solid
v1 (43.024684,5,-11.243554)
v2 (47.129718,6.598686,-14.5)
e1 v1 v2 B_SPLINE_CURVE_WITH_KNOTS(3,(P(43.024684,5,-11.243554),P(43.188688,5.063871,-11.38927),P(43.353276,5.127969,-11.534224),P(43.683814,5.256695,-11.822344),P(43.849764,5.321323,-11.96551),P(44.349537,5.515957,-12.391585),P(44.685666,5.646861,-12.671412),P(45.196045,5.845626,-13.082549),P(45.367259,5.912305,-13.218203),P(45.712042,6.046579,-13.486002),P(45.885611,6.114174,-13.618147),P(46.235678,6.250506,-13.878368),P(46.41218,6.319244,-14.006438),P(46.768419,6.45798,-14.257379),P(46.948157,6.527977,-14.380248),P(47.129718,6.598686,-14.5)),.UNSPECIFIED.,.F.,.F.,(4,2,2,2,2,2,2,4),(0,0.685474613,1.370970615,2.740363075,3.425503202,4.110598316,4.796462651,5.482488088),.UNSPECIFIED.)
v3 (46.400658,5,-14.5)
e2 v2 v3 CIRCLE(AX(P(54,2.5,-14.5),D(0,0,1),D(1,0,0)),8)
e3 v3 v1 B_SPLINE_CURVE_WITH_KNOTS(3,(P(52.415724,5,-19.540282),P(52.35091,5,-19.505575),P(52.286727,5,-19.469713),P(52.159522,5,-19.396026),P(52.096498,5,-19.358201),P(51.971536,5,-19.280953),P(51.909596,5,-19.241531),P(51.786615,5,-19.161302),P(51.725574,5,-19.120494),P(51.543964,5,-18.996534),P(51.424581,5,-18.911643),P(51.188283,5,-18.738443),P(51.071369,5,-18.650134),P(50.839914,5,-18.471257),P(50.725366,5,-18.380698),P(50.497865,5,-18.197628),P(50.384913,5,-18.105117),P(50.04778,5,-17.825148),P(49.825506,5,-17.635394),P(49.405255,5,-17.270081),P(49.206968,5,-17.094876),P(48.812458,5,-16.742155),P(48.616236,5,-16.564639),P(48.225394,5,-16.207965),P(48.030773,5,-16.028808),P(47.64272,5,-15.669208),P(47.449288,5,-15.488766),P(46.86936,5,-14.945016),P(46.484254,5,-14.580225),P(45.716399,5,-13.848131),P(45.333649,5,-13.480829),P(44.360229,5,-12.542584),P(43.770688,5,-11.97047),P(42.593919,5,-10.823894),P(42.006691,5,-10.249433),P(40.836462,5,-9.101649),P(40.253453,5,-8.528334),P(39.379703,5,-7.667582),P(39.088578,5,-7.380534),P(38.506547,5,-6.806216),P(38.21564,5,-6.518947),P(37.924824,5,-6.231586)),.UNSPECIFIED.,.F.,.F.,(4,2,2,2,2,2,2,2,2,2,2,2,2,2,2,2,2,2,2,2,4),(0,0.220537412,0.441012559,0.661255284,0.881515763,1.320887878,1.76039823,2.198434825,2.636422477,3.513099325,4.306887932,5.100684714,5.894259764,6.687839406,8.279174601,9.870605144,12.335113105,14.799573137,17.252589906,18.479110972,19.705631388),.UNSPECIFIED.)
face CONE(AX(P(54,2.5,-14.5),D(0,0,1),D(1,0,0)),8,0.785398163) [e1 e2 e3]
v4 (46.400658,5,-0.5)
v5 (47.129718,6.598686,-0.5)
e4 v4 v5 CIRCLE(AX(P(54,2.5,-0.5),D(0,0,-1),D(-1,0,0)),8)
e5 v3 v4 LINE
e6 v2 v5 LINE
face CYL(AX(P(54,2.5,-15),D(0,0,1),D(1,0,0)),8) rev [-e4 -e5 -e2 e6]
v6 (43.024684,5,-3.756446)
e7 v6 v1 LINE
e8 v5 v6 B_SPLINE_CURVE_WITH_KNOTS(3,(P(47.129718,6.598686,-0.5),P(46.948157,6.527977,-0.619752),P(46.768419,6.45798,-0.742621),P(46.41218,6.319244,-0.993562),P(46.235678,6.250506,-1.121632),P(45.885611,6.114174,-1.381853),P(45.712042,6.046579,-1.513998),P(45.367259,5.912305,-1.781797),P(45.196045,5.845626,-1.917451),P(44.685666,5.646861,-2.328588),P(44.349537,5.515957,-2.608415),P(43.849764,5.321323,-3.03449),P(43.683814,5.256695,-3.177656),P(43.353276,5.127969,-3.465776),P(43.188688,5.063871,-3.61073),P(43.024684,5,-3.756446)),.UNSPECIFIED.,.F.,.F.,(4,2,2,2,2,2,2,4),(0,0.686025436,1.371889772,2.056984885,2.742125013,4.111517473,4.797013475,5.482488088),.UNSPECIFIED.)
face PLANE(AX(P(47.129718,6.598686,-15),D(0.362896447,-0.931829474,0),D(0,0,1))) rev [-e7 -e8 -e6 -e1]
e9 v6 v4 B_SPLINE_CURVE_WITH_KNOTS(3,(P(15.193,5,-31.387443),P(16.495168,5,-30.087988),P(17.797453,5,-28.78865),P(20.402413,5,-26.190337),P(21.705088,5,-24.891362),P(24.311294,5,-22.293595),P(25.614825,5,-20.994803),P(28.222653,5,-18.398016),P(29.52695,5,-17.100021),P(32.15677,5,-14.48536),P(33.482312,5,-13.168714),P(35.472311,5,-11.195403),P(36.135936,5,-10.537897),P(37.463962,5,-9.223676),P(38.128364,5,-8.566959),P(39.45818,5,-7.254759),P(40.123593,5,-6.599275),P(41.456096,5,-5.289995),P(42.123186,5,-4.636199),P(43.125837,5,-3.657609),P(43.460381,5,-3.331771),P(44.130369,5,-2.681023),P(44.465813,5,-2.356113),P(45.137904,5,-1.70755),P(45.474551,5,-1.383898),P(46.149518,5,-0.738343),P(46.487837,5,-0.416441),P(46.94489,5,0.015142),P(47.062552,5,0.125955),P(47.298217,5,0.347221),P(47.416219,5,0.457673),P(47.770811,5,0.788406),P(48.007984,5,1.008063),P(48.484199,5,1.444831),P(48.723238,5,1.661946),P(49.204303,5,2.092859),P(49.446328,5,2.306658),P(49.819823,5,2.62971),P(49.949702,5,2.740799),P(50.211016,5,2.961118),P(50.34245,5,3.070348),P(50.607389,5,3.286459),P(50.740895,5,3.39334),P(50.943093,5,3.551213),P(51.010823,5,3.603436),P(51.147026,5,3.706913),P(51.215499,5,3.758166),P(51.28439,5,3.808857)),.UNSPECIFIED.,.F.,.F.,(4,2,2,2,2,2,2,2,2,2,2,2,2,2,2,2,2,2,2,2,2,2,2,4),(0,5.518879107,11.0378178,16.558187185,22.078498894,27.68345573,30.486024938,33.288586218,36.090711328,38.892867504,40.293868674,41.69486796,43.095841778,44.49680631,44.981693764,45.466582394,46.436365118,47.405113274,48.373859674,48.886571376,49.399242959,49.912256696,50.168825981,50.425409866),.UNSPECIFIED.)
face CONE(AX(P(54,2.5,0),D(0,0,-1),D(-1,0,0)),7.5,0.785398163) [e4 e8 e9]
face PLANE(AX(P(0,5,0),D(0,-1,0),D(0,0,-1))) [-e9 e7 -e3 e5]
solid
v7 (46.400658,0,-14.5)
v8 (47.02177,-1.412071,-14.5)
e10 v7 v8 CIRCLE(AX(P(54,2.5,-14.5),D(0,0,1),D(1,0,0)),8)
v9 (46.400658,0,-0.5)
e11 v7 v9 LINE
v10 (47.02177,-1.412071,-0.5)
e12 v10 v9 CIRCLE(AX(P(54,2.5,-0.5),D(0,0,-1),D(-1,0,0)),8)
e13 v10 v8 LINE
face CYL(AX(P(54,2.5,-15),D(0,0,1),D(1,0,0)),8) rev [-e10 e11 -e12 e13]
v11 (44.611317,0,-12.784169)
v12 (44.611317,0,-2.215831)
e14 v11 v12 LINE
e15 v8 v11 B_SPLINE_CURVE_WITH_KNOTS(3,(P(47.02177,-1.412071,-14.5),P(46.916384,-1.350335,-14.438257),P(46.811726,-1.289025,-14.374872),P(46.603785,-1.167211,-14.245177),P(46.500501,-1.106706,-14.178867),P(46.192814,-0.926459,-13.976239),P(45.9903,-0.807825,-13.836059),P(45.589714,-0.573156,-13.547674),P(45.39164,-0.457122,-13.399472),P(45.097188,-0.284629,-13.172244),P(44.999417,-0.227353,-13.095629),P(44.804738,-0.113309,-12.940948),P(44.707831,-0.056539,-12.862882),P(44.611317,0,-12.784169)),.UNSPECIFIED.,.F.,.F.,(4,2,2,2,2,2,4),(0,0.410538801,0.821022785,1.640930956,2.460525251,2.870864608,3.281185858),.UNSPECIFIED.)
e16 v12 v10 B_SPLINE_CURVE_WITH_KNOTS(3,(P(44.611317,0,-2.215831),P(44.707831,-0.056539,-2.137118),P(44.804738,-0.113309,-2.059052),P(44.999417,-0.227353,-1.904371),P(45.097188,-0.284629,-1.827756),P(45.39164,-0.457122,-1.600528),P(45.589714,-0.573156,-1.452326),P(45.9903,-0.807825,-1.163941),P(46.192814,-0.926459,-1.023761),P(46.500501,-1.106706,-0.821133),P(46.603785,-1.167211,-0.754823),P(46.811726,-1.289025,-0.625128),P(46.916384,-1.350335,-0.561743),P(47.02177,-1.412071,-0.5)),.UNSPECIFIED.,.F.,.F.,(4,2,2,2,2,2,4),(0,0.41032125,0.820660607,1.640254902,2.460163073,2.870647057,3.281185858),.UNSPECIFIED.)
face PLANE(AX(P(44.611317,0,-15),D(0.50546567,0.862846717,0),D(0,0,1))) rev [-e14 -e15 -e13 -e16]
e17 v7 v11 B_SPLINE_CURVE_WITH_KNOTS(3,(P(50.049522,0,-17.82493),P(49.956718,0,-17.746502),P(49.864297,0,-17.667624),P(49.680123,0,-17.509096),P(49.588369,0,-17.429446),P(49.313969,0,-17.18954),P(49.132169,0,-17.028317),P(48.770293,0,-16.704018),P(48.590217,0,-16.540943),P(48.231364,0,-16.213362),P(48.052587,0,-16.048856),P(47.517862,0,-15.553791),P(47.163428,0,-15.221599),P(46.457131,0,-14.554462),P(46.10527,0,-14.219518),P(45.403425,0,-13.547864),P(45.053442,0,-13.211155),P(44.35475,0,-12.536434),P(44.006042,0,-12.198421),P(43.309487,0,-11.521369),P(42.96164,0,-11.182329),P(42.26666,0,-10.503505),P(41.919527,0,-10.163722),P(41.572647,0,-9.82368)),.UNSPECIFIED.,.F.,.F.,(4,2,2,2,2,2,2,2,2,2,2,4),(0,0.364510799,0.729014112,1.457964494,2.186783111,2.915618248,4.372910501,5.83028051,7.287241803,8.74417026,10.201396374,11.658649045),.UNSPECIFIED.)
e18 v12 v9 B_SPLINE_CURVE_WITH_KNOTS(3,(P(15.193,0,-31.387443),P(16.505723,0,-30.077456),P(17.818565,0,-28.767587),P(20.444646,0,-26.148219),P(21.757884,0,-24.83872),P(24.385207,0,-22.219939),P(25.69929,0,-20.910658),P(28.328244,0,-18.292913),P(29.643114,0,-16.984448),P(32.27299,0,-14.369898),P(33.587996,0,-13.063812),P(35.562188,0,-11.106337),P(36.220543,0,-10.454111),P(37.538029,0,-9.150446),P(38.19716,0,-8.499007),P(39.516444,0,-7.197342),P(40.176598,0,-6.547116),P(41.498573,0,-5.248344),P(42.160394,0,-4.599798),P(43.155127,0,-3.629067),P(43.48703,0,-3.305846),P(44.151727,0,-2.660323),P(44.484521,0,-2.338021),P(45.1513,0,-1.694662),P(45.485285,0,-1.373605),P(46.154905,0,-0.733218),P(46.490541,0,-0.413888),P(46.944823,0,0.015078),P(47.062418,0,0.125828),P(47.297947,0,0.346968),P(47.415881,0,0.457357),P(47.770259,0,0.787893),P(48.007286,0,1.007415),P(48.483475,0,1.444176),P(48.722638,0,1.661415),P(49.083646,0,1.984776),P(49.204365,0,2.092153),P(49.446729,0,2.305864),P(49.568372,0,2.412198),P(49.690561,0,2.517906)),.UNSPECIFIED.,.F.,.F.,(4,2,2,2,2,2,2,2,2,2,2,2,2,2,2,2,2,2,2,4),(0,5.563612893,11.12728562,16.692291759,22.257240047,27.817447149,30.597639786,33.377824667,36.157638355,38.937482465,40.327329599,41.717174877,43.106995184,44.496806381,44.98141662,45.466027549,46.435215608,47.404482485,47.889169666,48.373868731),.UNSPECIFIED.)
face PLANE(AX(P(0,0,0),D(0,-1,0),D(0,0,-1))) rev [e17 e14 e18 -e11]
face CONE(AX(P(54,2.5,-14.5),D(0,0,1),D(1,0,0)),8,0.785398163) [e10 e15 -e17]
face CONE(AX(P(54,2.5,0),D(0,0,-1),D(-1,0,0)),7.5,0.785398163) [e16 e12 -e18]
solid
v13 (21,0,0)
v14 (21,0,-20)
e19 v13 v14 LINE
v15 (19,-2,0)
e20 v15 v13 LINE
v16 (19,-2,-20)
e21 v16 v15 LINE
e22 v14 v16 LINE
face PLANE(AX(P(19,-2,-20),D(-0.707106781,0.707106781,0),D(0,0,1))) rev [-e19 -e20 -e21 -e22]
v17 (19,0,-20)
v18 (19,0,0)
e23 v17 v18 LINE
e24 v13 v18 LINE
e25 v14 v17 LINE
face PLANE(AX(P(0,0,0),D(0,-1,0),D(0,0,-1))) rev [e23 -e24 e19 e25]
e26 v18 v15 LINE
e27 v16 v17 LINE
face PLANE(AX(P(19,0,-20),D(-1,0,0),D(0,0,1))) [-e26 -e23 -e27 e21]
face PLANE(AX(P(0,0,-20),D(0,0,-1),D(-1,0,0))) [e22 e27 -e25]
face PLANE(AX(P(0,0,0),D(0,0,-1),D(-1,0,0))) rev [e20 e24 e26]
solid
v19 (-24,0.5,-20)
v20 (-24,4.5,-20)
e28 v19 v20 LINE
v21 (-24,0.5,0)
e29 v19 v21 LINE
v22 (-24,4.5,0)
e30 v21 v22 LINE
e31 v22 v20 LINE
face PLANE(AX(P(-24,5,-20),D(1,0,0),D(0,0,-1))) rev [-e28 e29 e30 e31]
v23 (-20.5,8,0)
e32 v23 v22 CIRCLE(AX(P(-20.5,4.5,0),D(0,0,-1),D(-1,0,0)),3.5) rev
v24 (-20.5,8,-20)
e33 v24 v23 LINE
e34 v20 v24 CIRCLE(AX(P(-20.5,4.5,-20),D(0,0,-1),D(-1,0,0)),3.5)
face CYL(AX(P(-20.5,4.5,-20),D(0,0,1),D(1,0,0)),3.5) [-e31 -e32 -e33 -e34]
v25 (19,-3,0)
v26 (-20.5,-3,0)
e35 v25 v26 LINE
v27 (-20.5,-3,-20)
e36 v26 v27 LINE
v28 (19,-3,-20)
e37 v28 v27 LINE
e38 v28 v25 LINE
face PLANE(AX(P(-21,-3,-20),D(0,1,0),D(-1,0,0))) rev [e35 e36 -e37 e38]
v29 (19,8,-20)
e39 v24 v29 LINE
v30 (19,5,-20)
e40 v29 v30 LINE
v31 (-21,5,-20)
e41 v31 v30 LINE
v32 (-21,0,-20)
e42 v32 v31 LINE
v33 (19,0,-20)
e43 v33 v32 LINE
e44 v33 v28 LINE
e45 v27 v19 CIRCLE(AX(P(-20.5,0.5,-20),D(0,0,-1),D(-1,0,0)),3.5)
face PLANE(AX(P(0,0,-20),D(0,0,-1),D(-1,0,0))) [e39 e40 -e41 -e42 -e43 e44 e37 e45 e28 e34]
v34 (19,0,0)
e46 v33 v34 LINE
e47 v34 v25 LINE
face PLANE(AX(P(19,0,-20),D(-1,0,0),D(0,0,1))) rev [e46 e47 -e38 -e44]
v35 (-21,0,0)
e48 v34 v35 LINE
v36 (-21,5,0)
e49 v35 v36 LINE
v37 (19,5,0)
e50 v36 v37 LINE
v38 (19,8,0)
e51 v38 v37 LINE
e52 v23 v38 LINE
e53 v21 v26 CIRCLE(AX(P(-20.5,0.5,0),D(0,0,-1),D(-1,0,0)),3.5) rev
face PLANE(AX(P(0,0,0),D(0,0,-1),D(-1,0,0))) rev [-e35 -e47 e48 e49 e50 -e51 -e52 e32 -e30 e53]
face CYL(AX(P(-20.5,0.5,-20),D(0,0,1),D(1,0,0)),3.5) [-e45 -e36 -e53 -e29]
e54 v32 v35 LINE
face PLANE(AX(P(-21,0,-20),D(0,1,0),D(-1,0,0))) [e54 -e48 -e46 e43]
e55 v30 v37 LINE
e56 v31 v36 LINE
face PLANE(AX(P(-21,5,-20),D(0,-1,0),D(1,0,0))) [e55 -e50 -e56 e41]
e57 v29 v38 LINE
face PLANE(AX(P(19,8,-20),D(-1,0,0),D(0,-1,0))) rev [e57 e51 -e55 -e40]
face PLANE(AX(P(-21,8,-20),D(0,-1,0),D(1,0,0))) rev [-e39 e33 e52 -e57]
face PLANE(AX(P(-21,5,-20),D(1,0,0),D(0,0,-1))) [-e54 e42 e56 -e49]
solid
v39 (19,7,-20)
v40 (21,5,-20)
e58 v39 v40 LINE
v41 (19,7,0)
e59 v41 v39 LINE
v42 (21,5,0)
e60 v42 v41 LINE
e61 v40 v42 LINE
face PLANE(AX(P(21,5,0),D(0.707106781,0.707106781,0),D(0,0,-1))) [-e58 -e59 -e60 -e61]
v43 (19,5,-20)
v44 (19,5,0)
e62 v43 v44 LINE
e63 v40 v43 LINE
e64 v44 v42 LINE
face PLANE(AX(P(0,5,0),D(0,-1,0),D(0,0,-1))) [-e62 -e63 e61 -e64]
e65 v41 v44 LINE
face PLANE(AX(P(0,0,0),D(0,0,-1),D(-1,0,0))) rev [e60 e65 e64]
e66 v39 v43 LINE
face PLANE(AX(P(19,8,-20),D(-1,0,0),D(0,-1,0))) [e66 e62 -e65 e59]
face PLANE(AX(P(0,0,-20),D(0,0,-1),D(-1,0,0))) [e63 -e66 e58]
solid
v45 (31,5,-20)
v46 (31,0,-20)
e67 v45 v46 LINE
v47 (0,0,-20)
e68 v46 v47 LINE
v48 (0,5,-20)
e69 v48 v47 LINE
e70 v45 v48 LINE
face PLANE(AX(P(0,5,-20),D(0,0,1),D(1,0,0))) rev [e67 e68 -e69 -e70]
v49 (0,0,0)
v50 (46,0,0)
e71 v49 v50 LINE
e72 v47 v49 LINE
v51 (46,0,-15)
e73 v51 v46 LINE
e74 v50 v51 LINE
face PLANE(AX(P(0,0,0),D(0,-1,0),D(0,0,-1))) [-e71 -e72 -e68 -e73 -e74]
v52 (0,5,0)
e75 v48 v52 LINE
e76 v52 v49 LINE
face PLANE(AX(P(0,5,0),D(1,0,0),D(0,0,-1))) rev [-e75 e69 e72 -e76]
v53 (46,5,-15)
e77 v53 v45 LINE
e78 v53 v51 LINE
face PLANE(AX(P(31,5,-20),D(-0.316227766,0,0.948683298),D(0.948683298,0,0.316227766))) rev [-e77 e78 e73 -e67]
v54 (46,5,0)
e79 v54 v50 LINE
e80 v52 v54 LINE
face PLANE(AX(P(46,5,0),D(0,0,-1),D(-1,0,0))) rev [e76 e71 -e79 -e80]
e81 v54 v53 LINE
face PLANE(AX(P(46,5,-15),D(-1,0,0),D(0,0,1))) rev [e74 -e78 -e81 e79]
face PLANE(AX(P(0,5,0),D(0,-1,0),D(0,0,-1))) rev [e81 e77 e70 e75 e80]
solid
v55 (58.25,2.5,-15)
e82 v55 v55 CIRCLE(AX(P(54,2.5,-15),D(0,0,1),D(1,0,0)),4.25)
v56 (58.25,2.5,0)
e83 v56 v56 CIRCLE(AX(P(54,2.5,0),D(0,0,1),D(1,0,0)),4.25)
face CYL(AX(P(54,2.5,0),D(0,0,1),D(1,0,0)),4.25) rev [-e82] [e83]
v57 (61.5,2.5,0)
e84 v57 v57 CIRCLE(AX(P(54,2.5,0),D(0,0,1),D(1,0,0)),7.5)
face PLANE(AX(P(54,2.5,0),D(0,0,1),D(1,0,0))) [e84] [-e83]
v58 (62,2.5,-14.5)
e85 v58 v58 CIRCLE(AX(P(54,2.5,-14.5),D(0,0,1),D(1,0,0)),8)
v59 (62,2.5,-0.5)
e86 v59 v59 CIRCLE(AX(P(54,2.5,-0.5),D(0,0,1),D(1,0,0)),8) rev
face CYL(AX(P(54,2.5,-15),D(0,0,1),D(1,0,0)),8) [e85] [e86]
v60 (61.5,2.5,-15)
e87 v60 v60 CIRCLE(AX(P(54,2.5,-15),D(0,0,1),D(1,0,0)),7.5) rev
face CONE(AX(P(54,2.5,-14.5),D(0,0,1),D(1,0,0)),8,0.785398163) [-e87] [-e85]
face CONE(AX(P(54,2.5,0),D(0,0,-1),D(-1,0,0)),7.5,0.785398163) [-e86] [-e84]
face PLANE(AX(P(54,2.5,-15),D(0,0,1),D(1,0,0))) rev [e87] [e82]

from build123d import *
from OCP.BRepAlgoAPI import BRepAlgoAPI_Cut
from OCP.TopTools import TopTools_ListOfShape

# Parameters (mm, degrees)
P_IDAT_VYSUNUT_M1_DEPTH     = 5
VYSUNOUT_TENKOST_NN_1_DEPTH = 20
ZAOBLIT1_R                  = 3.5
SKICA3_R                    = 8
P_IDAT_VYSUNUT_M2_DEPTH     = 15
SKICA7_W                    = 4.25
SKICA7_H                    = 15.001
ZKOSEN_1_SIZE               = 0.5
KOUTOV_START                = -20
KOUTOV_SVAR_1_DEPTH         = 20
KOUTOV_SVAR_1_2_DEPTH       = 20
KOUTOV_START_2              = -12.784168981
KOUTOV_SVAR_2_DEPTH         = 10.568338072
KOUTOV_START_3              = -14.500001194
KOUTOV_SVAR_2_2_DEPTH       = 14.000001194
KOUTOV_SVAR_2_3_ANGLE       = 14.364836
KOUTOV_START_4              = -11.243553316
KOUTOV_SVAR_5_DEPTH         = 7.487106972
KOUTOV_START_5              = -14.500007293
KOUTOV_SVAR_5_2_DEPTH       = 14.000007293
KOUTOV_SVAR_5_3_ANGLE       = 17.987423


with BuildPart() as part:
    # Skica1 → Přidat vysunutím1 (new body)
    with BuildSketch(Plane(origin=(0, 0, 0), x_dir=(1, 0, 0), z_dir=(0, 1, 0))):
        Polygon((0, 0), (0, 20), (31, 20), (46, 15), (46, 0), align=None)
    extrude(amount=P_IDAT_VYSUNUT_M1_DEPTH)


with BuildPart() as body_2:
    # Skica2 → Vysunout tenkostěnný1 (new body)
    with BuildSketch(Plane.XY):
        Polygon((19, 5), (-21, 5), (-21, 0), (19, 0), (19, -3), (-24, -3), (-24, 8), (19, 8), align=None)
    extrude(amount=-VYSUNOUT_TENKOST_NN_1_DEPTH)

    # Zaoblit1
    zaoblit1_edges = [body_2.edges().sort_by_distance(p)[0] for p in [
        (-24, -3, -10),
        (-24, 8, -10),
    ]]
    fillet(zaoblit1_edges, radius=ZAOBLIT1_R)


with BuildPart() as body_3:
    # Skica3 → Přidat vysunutím2 (new body)
    with BuildSketch(Plane.XY):
        with Locations((54, 2.5)):
            Circle(SKICA3_R)
    extrude(amount=-P_IDAT_VYSUNUT_M2_DEPTH)

    # Skica7 → M10 závit1 (revolve, cut)
    with BuildSketch(Plane(origin=(54, 2.5, 0), x_dir=(0, -1, 0), z_dir=(1, 0, 0))):
        with Locations((2.125, 7.5005)):
            Rectangle(SKICA7_W, SKICA7_H)
    revolve(axis=Axis((54, 2.5, 6.35), (0, 0, -1)), mode=Mode.SUBTRACT)

    # Zkosení1
    zkosen_1_edges = [body_3.edges().sort_by_distance(p)[0] for p in [
        (46, 2.5, 0),
        (46, 2.5, -15),
    ]]
    chamfer(zkosen_1_edges, length=ZKOSEN_1_SIZE)


with BuildPart() as body_4:
    # Koutový svar...1: read off the stored shape, not the designer's step
    # Koutový svar...1 outline → Koutový svar...1 (new body)
    with BuildSketch(Plane.XY.offset(KOUTOV_START)):
        Polygon((19, -2), (21, 0), (19, 0), align=None)
    extrude(amount=KOUTOV_SVAR_1_DEPTH)


with BuildPart() as body_5:
    # Koutov_ svar...1 2 outline → Koutov_ svar...1 2 (new body)
    with BuildSketch(Plane.XY.offset(KOUTOV_START)):
        Polygon((19, 5), (21, 5), (19, 7), align=None)
    extrude(amount=KOUTOV_SVAR_1_2_DEPTH)


with BuildPart() as body_6:
    # Koutový svar...2: read off the stored shape, not the designer's step
    # Koutový svar...2 outline → Koutový svar...2 (new body)
    with BuildSketch(Plane.XY.offset(KOUTOV_START_2)):
        with BuildLine():
            Line((44.611317009, 0), (47.021769698, -1.412071299))
            ThreePointArc((47.021769698, -1.412071299), (46.677098222, -0.721041686), (46.400657923, 0))
            Line((46.400657923, 0), (44.611317009, 0))
        make_face()
    extrude(amount=KOUTOV_SVAR_2_DEPTH)


with BuildPart() as koutov_svar_2_2_tool:
    # Koutov_ svar...2 2 outline → Koutov_ svar...2 2 (new body)
    with BuildSketch(Plane.XY.offset(KOUTOV_START_3)):
        with BuildLine():
            Line((44.611317009, 0), (47.021769698, -1.412071299))
            ThreePointArc((47.021769698, -1.412071299), (46.677098222, -0.721041686), (46.400657923, 0))
            Line((46.400657923, 0), (44.611317009, 0))
        make_face()
    extrude(amount=KOUTOV_SVAR_2_2_DEPTH)


with BuildPart() as body_6_1:
    add(body_6.part)


with BuildPart() as body_6_2:
    # Koutov_ svar...2 2: joined with koutov_svar_2_2_tool
    add(body_6_1.part.fuse(koutov_svar_2_2_tool.part, tol=0.00001))


with BuildPart() as koutov_svar_2_3_tool:
    # Koutov_ svar...2 3 outline → Koutov_ svar...2 3 (revolve)
    with BuildSketch(Plane(origin=(54, 2.5, 0), x_dir=(-0.9663283779143345, -0.25731200134749094, 0), z_dir=(-0.25731200134749094, 0.9663283779143345, 0))):
        Polygon((9.715830813, -12.784169187), (7.999999947, -14.500000053), (9.715830809, -14.500001194), align=None)
        Polygon((7.999999779, -0.499999779), (9.715830809, -2.215830809), (9.715830813, -0.499999779), align=None)
    revolve(axis=Axis((54, 2.5, 0), (0, 0, 1)), revolution_arc=KOUTOV_SVAR_2_3_ANGLE)


with BuildPart() as body_6_3:
    add(body_6_2.part)

    # Koutov_ svar...2 3: cut by koutov_svar_2_3_tool, with a tolerance
    koutov_svar_2_3_stock = TopTools_ListOfShape()
    koutov_svar_2_3_stock.Append(body_6_3.part.wrapped)
    koutov_svar_2_3_tools = TopTools_ListOfShape()
    koutov_svar_2_3_tools.Append(koutov_svar_2_3_tool.part.wrapped)
    koutov_svar_2_3_cut = BRepAlgoAPI_Cut()
    koutov_svar_2_3_cut.SetArguments(koutov_svar_2_3_stock)
    koutov_svar_2_3_cut.SetTools(koutov_svar_2_3_tools)
    koutov_svar_2_3_cut.SetFuzzyValue(0.00001)
    koutov_svar_2_3_cut.Build()
    add(Compound.cast(koutov_svar_2_3_cut.Shape()).solids(), mode=Mode.REPLACE)


with BuildPart() as body_7:
    # Koutový svar...5: read off the stored shape, not the designer's step
    # Koutový svar...5 outline → Koutový svar...5 (new body)
    with BuildSketch(Plane.XY.offset(KOUTOV_START_4)):
        with BuildLine():
            Line((47.129717825, 6.598685501), (43.024683777, 5))
            Line((43.024683777, 5), (46.400657923, 5))
            ThreePointArc((46.400657923, 5), (46.721163875, 5.819419327), (47.129717825, 6.598685501))
        make_face()
    extrude(amount=KOUTOV_SVAR_5_DEPTH)


with BuildPart() as koutov_svar_5_2_tool:
    # Koutov_ svar...5 2 outline → Koutov_ svar...5 2 (new body)
    with BuildSketch(Plane.XY.offset(KOUTOV_START_5)):
        with BuildLine():
            Line((47.129717825, 6.598685501), (43.024683777, 5))
            Line((43.024683777, 5), (46.400657923, 5))
            ThreePointArc((46.400657923, 5), (46.721163875, 5.819419327), (47.129717825, 6.598685501))
        make_face()
    extrude(amount=KOUTOV_SVAR_5_2_DEPTH)


with BuildPart() as body_7_1:
    add(body_7.part)


with BuildPart() as body_7_2:
    # Koutov_ svar...5 2: joined with koutov_svar_5_2_tool
    add(body_7_1.part.fuse(koutov_svar_5_2_tool.part, tol=0.00001))


with BuildPart() as koutov_svar_5_3_tool:
    # Koutov_ svar...5 3 outline → Koutov_ svar...5 3 (revolve)
    with BuildSketch(Plane(origin=(54, 2.5, 0), x_dir=(-0.8587852718698237, 0.512335687630164, 0), z_dir=(0.512335687630164, 0.8587852718698237, 0))):
        Polygon((11.256445566, -11.243554434), (7.999999649, -14.500000351), (11.25644554, -14.500007293), align=None)
        Polygon((7.999999774, -0.499999774), (11.256445558, -3.756445558), (11.256445566, -0.499999774), align=None)
    revolve(axis=Axis((54, 2.5, 0), (0, 0, 1)), revolution_arc=KOUTOV_SVAR_5_3_ANGLE)


with BuildPart() as body_7_3:
    add(body_7_2.part)

    # Koutov_ svar...5 3: cut by koutov_svar_5_3_tool, with a tolerance
    koutov_svar_5_3_stock = TopTools_ListOfShape()
    koutov_svar_5_3_stock.Append(body_7_3.part.wrapped)
    koutov_svar_5_3_tools = TopTools_ListOfShape()
    koutov_svar_5_3_tools.Append(koutov_svar_5_3_tool.part.wrapped)
    koutov_svar_5_3_cut = BRepAlgoAPI_Cut()
    koutov_svar_5_3_cut.SetArguments(koutov_svar_5_3_stock)
    koutov_svar_5_3_cut.SetTools(koutov_svar_5_3_tools)
    koutov_svar_5_3_cut.SetFuzzyValue(0.00001)
    koutov_svar_5_3_cut.Build()
    add(Compound.cast(koutov_svar_5_3_cut.Shape()).solids(), mode=Mode.REPLACE)


solid = Compound([part.part, body_2.part, body_3.part, body_4.part, body_5.part, body_6_3.part, body_7_3.part])
